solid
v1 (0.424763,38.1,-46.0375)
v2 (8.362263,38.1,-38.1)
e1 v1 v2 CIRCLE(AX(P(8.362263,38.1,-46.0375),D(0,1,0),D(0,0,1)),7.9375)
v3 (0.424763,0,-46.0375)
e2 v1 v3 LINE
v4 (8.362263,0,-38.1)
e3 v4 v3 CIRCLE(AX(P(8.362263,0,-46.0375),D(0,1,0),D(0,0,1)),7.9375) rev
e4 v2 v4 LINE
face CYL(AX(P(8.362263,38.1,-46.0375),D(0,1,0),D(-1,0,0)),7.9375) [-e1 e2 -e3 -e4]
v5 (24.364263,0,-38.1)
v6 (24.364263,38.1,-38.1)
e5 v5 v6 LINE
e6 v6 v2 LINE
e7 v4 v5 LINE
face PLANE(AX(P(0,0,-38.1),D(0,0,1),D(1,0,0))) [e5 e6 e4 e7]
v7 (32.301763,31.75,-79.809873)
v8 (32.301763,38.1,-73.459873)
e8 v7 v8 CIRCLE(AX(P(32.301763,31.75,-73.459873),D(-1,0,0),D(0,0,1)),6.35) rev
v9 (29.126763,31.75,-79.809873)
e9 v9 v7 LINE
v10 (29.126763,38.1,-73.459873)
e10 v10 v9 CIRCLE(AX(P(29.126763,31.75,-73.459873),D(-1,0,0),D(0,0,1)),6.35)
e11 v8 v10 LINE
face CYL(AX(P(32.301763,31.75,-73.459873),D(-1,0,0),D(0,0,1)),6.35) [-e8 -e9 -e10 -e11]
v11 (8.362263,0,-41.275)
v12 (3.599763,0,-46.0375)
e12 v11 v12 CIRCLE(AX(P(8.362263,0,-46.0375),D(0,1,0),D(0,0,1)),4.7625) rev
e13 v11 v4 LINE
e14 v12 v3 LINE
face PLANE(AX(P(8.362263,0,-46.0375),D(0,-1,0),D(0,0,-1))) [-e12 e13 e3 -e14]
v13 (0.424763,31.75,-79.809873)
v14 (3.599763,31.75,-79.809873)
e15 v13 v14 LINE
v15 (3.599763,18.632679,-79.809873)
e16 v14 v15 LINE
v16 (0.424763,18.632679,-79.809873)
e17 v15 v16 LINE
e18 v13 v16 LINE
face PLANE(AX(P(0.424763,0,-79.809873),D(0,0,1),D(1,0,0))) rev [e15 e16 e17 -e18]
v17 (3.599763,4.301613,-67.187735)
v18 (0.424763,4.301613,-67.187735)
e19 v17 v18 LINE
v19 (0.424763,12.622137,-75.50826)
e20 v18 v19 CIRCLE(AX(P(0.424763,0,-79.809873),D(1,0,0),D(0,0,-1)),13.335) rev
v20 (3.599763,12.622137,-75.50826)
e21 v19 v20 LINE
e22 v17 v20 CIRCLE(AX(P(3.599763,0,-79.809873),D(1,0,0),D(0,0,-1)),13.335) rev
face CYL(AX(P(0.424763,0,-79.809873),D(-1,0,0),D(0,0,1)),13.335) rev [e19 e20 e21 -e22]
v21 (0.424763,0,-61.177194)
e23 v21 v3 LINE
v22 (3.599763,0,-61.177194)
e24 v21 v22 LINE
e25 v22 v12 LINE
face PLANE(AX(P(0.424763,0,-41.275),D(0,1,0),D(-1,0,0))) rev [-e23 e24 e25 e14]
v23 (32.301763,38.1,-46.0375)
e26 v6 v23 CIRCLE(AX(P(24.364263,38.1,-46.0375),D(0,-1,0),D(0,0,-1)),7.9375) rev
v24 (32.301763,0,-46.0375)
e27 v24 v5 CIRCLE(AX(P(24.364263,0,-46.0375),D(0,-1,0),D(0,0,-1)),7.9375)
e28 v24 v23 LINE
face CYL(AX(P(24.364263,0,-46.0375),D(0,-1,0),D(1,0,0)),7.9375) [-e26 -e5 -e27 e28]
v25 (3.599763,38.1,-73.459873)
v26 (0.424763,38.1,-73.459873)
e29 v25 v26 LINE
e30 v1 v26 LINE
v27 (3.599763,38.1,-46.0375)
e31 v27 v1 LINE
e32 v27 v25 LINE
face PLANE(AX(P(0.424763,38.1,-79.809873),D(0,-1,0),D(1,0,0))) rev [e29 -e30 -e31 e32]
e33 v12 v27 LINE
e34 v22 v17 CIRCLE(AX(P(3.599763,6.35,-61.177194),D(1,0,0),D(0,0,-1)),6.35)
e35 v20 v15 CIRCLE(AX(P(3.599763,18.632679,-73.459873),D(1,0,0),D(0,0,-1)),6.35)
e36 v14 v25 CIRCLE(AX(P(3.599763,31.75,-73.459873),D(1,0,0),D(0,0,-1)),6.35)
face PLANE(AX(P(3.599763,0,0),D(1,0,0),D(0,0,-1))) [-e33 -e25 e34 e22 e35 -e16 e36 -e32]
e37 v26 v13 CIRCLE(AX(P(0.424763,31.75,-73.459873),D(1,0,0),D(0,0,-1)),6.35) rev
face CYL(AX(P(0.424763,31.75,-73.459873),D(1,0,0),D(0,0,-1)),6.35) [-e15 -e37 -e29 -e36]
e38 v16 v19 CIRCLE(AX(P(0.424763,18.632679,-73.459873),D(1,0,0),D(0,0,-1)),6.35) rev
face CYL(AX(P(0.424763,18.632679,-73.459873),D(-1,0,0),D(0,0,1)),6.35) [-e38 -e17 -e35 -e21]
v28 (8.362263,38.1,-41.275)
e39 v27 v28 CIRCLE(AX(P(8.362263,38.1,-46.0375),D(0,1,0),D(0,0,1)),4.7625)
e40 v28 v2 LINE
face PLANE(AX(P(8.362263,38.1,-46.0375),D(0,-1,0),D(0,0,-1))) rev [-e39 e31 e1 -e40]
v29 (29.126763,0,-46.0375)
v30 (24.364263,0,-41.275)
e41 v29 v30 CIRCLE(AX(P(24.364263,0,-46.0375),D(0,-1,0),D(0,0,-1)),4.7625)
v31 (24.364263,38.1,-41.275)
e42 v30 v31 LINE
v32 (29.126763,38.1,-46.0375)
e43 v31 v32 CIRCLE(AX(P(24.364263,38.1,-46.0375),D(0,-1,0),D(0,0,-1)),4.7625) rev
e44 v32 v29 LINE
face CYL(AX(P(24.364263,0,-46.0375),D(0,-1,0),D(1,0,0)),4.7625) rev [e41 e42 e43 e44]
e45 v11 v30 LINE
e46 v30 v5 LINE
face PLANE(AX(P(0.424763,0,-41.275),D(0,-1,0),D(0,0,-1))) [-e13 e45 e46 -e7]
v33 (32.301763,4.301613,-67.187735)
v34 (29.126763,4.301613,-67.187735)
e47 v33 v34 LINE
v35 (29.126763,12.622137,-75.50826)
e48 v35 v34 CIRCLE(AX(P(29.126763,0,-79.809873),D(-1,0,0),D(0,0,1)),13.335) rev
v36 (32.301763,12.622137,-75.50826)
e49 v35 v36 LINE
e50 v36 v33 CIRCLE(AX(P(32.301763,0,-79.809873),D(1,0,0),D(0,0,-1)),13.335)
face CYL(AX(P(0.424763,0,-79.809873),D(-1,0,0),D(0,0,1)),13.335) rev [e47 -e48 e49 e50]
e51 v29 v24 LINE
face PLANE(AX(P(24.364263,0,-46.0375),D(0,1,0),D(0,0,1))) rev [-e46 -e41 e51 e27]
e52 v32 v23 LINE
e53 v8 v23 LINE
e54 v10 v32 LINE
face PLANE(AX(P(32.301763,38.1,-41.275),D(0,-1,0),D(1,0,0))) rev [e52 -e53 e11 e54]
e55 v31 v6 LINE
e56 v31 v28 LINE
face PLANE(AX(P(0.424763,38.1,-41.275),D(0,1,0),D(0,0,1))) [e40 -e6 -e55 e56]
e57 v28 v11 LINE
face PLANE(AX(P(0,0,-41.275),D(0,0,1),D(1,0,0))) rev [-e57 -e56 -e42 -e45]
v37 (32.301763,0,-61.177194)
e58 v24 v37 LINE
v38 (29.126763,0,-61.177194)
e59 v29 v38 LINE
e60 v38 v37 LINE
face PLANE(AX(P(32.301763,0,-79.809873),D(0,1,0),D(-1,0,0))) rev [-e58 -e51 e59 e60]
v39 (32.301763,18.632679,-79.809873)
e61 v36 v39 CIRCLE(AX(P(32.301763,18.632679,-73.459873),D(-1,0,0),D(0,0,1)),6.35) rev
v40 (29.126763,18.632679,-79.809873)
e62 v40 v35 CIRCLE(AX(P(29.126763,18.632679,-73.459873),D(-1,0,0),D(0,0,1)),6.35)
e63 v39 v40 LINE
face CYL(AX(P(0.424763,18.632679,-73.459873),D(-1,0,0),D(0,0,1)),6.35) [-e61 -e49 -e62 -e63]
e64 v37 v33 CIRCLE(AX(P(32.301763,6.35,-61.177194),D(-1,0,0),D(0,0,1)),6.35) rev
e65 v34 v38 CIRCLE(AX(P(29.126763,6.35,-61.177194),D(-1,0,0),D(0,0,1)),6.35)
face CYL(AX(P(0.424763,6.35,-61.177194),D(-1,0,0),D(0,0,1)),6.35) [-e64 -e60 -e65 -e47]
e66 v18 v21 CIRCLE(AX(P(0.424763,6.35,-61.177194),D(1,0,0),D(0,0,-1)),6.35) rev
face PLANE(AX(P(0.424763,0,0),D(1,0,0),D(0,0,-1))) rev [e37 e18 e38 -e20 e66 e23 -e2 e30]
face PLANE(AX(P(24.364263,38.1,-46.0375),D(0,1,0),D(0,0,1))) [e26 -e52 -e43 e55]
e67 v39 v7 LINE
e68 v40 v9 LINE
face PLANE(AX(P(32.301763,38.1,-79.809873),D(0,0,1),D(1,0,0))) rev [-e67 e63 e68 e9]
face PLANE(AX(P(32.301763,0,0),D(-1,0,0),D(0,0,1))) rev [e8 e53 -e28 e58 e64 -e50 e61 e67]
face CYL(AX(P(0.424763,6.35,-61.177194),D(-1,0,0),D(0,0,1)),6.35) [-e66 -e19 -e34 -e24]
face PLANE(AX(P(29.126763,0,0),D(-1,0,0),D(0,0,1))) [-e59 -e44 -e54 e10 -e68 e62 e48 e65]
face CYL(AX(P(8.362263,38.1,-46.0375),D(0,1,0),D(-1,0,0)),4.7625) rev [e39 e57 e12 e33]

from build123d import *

# Parameters (mm, degrees)
SKETCH1_W                      = 31.877
SKETCH1_H                      = 38.1
BASE_FLANGE1_DEPTH             = 3.175
EDGE_FLANGE1_STRIP_W           = 22.225
EDGE_FLANGE1_STRIP_H           = 3.175
EDGE_FLANGE1_STRIP_CUT_DEPTH   = 38.1
EDGE_FLANGE1_STRIP_2_W         = 22.225
EDGE_FLANGE1_STRIP_2_H         = 3.175
EDGE_FLANGE1_STRIP_CUT_2_DEPTH = 38.1
EDGE_FLANGE1_DEPTH             = 38.1
EDGE_FLANGE1_BEND_DEPTH        = 38.1
CUT_EXTRUDE1_DEPTH             = 95.152162324
CUT_EXTRUDE1_DEPTH_BACK        = 95.152162324
SKETCH12_R                     = 13.335
BREAK_CORNER1_START            = 0.424763322
BREAK_CORNER1_DEPTH            = 31.877


# Read off the part's stored shape, not the designer's step: Break-Corner1
# Sheet-metal steps are written as plain solids
with BuildPart() as part:
    # Sketch1 → Base-Flange1 (new body)
    with BuildSketch(Plane.XY.offset(-38.1)):
        with Locations((16.363263322, 19.05)):
            Rectangle(SKETCH1_W, SKETCH1_H)
    extrude(amount=-BASE_FLANGE1_DEPTH)

    # Edge-Flange1 strip (across the edge) → Edge-Flange1 strip cut (cut)
    with BuildSketch(Plane(origin=(32.301763322, 38.1, -41.275), x_dir=(-1, 0, 0), z_dir=(0, -1, 0))):
        with Locations((-3.175, -1.5875)):
            Rectangle(EDGE_FLANGE1_STRIP_W, EDGE_FLANGE1_STRIP_H)
    extrude(amount=EDGE_FLANGE1_STRIP_CUT_DEPTH, mode=Mode.SUBTRACT)

    # Edge-Flange1 strip 2 (across the edge) → Edge-Flange1 strip cut 2 (cut)
    with BuildSketch(Plane(origin=(0.424763322, 0, -41.275), x_dir=(1, 0, 0), z_dir=(0, 1, 0))):
        with Locations((-3.175, -1.5875)):
            Rectangle(EDGE_FLANGE1_STRIP_2_W, EDGE_FLANGE1_STRIP_2_H)
    extrude(amount=EDGE_FLANGE1_STRIP_CUT_2_DEPTH, mode=Mode.SUBTRACT)

    # Edge-Flange1 section (across the edge) → Edge-Flange1 (add)
    with BuildSketch(Plane(origin=(32.301763322, 38.1, -41.275), x_dir=(-1, 0, 0), z_dir=(0, -1, 0))):
        with BuildLine():
            Line((0, 4.7625), (0, 38.534872551))
            Line((0, 38.534872551), (3.175, 38.534872551))
            Line((3.175, 38.534872551), (3.175, 4.7625))
            ThreePointArc((3.175, 4.7625), (4.569903955, 1.394903955), (7.9375, 0))
            Line((7.9375, 0), (7.9375, -3.175))
            ThreePointArc((7.9375, -3.175), (2.324839924, -0.850160076), (0, 4.7625))
        make_face()
    extrude(amount=EDGE_FLANGE1_DEPTH)

    # Edge-Flange1 section 2 (across the edge) → Edge-Flange1 bend (add)
    with BuildSketch(Plane(origin=(0.424763322, 0, -41.275), x_dir=(1, 0, 0), z_dir=(0, 1, 0))):
        with BuildLine():
            Line((0, 4.7625), (0, 38.534872551))
            Line((0, 38.534872551), (3.175, 38.534872551))
            Line((3.175, 38.534872551), (3.175, 4.7625))
            ThreePointArc((3.175, 4.7625), (4.569903955, 1.394903955), (7.9375, 0))
            Line((7.9375, 0), (7.9375, -3.175))
            ThreePointArc((7.9375, -3.175), (2.324839924, -0.850160076), (0, 4.7625))
        make_face()
    extrude(amount=EDGE_FLANGE1_BEND_DEPTH)

    # Sketch12 → Cut-Extrude1 (cut, two sides: drawn at the far end of the back side and taken through both)
    with BuildSketch(Plane(origin=(0, 0, 0), x_dir=(0, 0, -1), z_dir=(1, 0, 0)).offset(-CUT_EXTRUDE1_DEPTH_BACK)):
        with Locations((79.809872551, 0)):
            Circle(SKETCH12_R)
    extrude(amount=CUT_EXTRUDE1_DEPTH + CUT_EXTRUDE1_DEPTH_BACK, mode=Mode.SUBTRACT)

    # Break-Corner1 outline → Break-Corner1 (cut)
    with BuildSketch(Plane.YZ.offset(BREAK_CORNER1_START)):
        with BuildLine():
            Line((13.335, -79.809872551), (18.632678954, -79.809872551))
            ThreePointArc((18.632678954, -79.809872551), (14.937057089, -78.623677256), (12.622137356, -75.508259648))
            ThreePointArc((12.622137356, -75.508259648), (13.15557727, -77.629732262), (13.335, -79.809872551))
        make_face()
        with BuildLine():
            ThreePointArc((38.1, -73.459872551), (36.24012806, -77.950000612), (31.75, -79.809872551))
            Line((31.75, -79.809872551), (38.1, -79.809872551))
            Line((38.1, -79.809872551), (38.1, -73.459872551))
        make_face()
        with BuildLine():
            ThreePointArc((0, -66.474872551), (2.180140289, -66.654295281), (4.301612903, -67.187735195))
            ThreePointArc((4.301612903, -67.187735195), (1.186195295, -64.872815462), (0, -61.177193597))
            Line((0, -61.177193597), (0, -66.474872551))
        make_face()
    extrude(amount=BREAK_CORNER1_DEPTH, mode=Mode.SUBTRACT)


solid = part.part
